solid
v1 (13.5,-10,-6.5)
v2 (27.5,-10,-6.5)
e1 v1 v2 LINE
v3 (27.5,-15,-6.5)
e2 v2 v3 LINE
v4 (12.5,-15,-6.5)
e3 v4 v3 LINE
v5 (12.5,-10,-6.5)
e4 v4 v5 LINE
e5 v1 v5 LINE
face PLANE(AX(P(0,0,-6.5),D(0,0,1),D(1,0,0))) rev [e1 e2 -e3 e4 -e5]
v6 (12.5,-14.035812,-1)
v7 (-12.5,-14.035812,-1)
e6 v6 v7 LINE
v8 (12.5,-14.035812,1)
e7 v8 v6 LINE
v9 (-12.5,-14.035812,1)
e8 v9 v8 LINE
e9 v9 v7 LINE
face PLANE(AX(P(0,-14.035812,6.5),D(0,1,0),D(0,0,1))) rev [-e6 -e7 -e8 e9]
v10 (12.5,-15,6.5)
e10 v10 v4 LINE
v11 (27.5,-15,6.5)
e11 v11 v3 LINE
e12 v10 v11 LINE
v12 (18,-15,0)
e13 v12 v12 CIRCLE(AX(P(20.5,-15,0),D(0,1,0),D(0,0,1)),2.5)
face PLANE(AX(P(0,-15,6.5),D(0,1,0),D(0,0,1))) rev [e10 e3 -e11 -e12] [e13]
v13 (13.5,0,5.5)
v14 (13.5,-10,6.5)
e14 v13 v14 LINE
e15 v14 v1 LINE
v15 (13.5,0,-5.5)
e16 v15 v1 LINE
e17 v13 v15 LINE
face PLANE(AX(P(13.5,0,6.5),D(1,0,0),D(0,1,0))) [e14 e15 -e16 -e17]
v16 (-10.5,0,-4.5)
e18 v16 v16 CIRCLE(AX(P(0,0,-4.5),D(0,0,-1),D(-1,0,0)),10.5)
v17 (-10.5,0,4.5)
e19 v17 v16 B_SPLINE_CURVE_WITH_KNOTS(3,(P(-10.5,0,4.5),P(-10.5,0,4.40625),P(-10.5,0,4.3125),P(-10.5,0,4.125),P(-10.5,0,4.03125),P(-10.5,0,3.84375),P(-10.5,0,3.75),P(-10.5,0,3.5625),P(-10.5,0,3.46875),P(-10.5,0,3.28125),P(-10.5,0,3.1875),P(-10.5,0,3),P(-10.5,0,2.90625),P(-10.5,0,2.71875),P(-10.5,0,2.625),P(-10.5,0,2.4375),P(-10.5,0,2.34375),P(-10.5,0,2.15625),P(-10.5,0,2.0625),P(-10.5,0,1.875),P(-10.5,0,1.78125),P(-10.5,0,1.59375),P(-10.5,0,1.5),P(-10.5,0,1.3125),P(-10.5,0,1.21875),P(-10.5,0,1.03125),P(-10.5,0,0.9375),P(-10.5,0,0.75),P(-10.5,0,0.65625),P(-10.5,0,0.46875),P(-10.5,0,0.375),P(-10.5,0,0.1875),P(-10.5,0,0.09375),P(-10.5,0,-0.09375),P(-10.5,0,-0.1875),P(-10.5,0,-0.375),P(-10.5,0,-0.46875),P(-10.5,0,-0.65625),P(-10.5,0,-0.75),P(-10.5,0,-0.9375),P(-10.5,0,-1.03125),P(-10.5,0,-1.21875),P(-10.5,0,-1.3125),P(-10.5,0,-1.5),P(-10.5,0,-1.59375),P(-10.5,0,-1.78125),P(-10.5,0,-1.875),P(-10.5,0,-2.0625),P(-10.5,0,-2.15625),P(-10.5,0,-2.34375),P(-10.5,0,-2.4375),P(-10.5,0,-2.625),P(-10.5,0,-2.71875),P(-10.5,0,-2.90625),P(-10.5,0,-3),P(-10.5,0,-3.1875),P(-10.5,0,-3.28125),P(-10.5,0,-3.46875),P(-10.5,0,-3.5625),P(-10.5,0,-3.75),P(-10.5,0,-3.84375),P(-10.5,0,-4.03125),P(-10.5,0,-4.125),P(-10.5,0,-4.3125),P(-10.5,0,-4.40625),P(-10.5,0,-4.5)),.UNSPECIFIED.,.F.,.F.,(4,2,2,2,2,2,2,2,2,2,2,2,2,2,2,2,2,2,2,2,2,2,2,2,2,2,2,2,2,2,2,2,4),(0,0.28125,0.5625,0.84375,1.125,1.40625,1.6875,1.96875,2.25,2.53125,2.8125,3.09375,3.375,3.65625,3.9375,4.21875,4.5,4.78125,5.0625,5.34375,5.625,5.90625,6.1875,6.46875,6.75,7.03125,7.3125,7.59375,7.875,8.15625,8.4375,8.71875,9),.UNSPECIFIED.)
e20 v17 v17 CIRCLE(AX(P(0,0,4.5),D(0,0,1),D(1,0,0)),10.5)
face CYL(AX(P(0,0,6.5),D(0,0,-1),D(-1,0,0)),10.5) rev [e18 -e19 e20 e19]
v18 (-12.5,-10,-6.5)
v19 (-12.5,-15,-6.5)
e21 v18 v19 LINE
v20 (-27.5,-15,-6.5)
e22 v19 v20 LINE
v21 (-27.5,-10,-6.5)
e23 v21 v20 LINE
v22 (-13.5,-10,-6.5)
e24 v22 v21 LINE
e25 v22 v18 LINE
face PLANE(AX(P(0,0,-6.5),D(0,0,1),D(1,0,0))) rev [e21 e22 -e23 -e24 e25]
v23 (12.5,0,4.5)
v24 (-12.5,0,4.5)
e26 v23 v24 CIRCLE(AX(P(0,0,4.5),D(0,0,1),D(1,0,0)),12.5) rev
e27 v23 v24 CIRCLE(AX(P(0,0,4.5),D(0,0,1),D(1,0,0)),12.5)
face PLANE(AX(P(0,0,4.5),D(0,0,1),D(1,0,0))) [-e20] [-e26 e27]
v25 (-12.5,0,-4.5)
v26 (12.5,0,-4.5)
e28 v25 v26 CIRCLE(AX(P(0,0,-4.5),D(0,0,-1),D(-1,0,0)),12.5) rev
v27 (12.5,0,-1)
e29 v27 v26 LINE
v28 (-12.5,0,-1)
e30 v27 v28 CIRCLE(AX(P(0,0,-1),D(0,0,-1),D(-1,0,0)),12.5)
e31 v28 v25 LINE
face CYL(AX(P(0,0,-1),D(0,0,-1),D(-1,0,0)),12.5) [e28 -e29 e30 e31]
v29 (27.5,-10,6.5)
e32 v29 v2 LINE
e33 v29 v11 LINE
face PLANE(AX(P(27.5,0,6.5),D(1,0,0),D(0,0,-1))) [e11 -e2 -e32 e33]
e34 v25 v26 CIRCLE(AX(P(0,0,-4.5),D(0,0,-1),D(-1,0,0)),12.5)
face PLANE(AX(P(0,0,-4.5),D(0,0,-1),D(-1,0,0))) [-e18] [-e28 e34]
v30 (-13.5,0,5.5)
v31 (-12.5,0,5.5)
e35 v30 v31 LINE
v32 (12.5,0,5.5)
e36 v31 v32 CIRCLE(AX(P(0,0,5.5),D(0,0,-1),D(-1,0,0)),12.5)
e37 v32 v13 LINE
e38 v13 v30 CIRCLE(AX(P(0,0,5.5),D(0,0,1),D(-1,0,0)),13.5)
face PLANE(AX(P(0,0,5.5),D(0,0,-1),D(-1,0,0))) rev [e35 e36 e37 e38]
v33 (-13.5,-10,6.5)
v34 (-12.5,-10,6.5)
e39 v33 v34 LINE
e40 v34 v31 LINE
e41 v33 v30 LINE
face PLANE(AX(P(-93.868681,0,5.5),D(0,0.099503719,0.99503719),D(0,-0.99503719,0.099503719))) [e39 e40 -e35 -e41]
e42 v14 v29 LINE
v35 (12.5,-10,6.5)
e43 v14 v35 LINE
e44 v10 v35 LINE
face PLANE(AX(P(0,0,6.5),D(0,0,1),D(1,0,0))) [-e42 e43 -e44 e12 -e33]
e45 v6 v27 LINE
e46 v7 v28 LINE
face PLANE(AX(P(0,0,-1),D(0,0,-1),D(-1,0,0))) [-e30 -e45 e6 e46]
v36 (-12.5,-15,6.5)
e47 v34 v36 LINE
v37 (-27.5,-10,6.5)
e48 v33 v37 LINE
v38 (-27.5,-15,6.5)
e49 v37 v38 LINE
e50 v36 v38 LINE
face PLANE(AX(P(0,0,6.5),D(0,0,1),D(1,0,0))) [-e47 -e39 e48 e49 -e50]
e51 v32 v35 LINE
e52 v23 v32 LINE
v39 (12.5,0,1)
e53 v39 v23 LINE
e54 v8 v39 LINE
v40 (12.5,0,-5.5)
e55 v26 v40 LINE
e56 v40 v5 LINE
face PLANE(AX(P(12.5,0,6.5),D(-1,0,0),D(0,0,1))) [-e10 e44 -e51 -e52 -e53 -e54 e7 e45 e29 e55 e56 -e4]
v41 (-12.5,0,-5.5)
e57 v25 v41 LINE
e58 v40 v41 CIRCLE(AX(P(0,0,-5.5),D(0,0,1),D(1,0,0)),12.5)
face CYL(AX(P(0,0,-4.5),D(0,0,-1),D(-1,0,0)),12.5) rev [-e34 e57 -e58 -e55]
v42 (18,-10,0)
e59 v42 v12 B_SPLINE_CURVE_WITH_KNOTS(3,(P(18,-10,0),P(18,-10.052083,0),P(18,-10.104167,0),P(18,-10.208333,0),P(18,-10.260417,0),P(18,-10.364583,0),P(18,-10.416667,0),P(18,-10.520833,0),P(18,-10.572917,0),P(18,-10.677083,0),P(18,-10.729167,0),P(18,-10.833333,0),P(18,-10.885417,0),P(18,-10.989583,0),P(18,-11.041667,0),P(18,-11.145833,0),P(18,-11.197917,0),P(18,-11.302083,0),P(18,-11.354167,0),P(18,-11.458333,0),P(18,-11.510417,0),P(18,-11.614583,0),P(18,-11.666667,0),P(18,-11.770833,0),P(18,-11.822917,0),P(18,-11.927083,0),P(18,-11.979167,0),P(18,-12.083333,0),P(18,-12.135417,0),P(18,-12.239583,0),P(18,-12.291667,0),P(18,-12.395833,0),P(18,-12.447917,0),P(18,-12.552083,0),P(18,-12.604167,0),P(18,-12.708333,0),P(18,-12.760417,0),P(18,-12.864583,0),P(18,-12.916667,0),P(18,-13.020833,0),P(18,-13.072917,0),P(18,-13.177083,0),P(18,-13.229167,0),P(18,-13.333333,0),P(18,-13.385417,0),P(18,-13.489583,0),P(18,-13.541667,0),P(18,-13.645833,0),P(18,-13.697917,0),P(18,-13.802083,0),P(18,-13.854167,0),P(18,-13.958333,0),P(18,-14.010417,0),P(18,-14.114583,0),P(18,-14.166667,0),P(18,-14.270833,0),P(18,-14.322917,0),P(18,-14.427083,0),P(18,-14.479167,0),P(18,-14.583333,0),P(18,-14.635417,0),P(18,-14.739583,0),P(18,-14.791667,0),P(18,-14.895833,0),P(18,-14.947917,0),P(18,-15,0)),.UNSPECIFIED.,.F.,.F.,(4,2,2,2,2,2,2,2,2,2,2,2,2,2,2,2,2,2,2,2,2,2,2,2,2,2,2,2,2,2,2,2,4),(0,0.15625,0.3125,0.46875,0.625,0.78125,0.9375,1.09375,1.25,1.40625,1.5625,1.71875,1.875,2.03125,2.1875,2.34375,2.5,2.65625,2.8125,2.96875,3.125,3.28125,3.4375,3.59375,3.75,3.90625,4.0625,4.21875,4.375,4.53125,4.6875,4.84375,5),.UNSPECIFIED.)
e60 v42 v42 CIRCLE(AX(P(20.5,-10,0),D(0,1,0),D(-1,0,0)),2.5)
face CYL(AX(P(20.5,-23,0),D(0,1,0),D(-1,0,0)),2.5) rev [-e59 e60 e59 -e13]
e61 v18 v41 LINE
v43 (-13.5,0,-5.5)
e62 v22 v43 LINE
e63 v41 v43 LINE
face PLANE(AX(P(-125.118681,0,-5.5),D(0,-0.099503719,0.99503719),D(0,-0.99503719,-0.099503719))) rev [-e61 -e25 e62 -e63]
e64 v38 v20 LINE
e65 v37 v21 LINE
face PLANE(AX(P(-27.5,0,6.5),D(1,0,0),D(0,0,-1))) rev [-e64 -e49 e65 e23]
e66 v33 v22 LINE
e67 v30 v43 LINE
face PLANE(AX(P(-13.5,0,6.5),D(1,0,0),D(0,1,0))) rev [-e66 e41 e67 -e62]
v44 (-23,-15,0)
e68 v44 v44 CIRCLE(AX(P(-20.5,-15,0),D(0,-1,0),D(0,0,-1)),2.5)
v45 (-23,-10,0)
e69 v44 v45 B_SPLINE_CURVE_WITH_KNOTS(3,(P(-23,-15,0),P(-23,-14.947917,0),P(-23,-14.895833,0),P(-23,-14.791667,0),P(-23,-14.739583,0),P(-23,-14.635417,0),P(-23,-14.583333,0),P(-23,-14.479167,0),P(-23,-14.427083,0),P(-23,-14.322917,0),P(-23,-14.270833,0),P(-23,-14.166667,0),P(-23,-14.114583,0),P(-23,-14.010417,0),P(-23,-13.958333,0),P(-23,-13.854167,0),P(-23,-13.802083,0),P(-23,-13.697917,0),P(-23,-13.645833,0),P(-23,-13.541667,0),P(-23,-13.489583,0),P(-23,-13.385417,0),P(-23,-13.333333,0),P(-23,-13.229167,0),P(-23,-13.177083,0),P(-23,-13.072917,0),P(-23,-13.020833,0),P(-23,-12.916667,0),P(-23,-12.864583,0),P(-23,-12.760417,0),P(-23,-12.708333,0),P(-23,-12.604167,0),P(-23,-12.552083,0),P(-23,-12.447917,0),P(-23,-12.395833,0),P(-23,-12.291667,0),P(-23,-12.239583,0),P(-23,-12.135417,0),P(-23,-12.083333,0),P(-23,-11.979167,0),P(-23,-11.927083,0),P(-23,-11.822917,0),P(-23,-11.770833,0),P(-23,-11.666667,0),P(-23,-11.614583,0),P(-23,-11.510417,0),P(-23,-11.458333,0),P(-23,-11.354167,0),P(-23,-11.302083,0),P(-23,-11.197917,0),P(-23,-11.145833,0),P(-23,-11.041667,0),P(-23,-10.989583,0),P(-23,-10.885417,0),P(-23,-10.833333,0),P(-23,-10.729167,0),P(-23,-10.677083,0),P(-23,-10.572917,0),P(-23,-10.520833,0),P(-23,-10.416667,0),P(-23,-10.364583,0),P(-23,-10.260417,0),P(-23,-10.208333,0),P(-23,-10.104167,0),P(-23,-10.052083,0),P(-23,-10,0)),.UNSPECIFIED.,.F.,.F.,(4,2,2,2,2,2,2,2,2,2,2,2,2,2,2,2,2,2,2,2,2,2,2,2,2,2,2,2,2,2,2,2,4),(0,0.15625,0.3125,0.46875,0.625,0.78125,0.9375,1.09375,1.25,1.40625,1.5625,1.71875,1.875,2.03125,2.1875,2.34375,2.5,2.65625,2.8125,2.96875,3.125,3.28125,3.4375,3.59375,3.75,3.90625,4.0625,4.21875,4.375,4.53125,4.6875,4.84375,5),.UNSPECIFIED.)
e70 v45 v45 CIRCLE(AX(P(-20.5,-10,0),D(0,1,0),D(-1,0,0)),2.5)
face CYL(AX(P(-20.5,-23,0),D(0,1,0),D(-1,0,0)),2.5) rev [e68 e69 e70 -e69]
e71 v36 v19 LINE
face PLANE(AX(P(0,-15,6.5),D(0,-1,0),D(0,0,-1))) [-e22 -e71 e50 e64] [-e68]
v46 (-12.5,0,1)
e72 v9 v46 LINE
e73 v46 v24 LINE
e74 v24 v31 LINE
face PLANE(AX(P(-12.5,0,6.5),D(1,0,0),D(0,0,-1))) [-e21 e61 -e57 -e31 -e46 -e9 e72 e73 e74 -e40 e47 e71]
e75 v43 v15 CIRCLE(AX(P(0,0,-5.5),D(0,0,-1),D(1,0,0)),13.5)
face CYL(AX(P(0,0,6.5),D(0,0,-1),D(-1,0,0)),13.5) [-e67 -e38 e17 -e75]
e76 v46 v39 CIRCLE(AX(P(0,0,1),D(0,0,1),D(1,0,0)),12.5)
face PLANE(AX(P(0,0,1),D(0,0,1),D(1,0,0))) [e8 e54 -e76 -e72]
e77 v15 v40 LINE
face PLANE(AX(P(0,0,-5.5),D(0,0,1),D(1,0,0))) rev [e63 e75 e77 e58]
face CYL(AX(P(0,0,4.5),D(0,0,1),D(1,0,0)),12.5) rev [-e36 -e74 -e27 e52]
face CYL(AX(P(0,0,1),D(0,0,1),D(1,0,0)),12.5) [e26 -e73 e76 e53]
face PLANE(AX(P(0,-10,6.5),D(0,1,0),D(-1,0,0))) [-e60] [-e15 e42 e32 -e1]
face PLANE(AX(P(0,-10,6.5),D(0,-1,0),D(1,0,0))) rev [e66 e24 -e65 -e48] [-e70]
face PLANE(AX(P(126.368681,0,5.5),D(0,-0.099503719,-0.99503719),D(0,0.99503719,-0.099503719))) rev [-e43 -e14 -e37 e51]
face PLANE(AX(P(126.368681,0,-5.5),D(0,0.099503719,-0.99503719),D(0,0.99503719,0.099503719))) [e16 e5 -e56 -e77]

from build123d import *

# Parameters (mm, degrees)
SKETCH1_R                = 12.5
SKETCH1_R_2              = 4
BOSS_EXTRUDE1_DEPTH      = 6.5
CUT_EXTRUDE1_DEPTH       = 5.5
CUT_EXTRUDE2_START       = -5.5
CUT_EXTRUDE2_DEPTH       = 5.5
SKETCH5_R                = 12.5
SKETCH5_R_2              = 10.5
CUT_EXTRUDE3_DEPTH       = 2
CUT_EXTRUDE4_START       = -2
SKETCH6_R                = 12.5
SKETCH6_R_2              = 10.5
CUT_EXTRUDE4_DEPTH       = 2
CUT_EXTRUDE5_START       = -13
SKETCH7_R                = 10.5
CUT_EXTRUDE5_DEPTH       = 13
SKETCH8_R                = 2.5
CUT_EXTRUDE6_DEPTH       = 13
CUT_EXTRUDE7_DEPTH       = 1
CUT_EXTRUDE8_START       = -1
CUT_EXTRUDE8_DEPTH       = 1
CUT_EXTRUDE9_START       = -1
CUT_EXTRUDE9_DEPTH       = 1
CUT_EXTRUDE10_DEPTH      = 45.138985036
CUT_EXTRUDE10_DEPTH_BACK = 1
CUT_EXTRUDE11_START      = -1
CUT_EXTRUDE11_DEPTH      = 1
CUT_EXTRUDE12_DEPTH      = 45.138985036
CUT_EXTRUDE12_DEPTH_BACK = 1


# Read off the part's stored shape, not the designer's step: Cut-Extrude9, Cut-Extrude11
with BuildPart() as part:
    # Sketch1 → Boss-Extrude1 (new, symmetric)
    # profile 1 of 10: a face of its own
    with BuildSketch(Plane.XY):
        Circle(SKETCH1_R)
        with Locations(Location((0, 0, 0), (0, 0, 180))):
            Circle(SKETCH1_R_2, mode=Mode.SUBTRACT)
    # profile 2 of 10: a face of its own
    with BuildSketch(Plane.XY):
        with BuildLine():
            ThreePointArc((-13.5, 0), (-13.247641299, -2.598076211), (-12.5, -5.099019514))
            Line((-12.5, -5.099019514), (-12.5, 0))
            ThreePointArc((-12.5, 0), (0, 12.5), (12.5, 0))
            Line((12.5, 0), (12.5, -5.099019514))
            ThreePointArc((12.5, -5.099019514), (13.247641299, -2.598076211), (13.5, 0))
            ThreePointArc((13.5, 0), (0, 13.5), (-13.5, 0))
        make_face()
    # profile 3 of 10: a face of its own
    with BuildSketch(Plane.XY):
        with BuildLine():
            Line((-12.5, 0), (-12.5, -5.099019514))
            ThreePointArc((-12.5, -5.099019514), (0, -13.5), (12.5, -5.099019514))
            Line((12.5, -5.099019514), (12.5, 0))
            ThreePointArc((12.5, 0), (0, -12.5), (-12.5, 0))
        make_face()
    # profile 4 of 10: a face of its own
    with BuildSketch(Plane.XY):
        with BuildLine():
            ThreePointArc((-13.5, 0), (-13.247641299, -2.598076211), (-12.5, -5.099019514))
            Line((-12.5, -5.099019514), (-12.5, 0))
            ThreePointArc((-12.5, 0), (0, 12.5), (12.5, 0))
            Line((12.5, 0), (12.5, -5.099019514))
            ThreePointArc((12.5, -5.099019514), (13.247641299, -2.598076211), (13.5, 0))
            ThreePointArc((13.5, 0), (0, 13.5), (-13.5, 0))
        make_face()
    # profile 5 of 10: a face of its own
    with BuildSketch(Plane.XY):
        with BuildLine():
            Line((-12.5, 0), (-12.5, -5.099019514))
            ThreePointArc((-12.5, -5.099019514), (0, -13.5), (12.5, -5.099019514))
            Line((12.5, -5.099019514), (12.5, 0))
            ThreePointArc((12.5, 0), (0, -12.5), (-12.5, 0))
        make_face()
    # profile 6 of 10: a face of its own
    with BuildSketch(Plane.XY):
        with BuildLine():
            Line((-13.5, -10), (-12.5, -10))
            Line((-12.5, -10), (-12.5, -5.099019514))
            ThreePointArc((-12.5, -5.099019514), (-13.247641299, -2.598076211), (-13.5, 0))
            Line((-13.5, 0), (-13.5, -10))
        make_face()
    # profile 7 of 10: a face of its own
    with BuildSketch(Plane.XY):
        Polygon((-12.5, -14.03581164), (-12.5, -10), (-13.5, -10), (-27.5, -10), (-27.5, -15), (-12.5, -15), align=None)
    # profile 8 of 10: a face of its own
    with BuildSketch(Plane.XY):
        with BuildLine():
            Line((-12.5, -5.099019514), (-12.5, -10))
            Line((-12.5, -10), (-12.5, -14.03581164))
            Line((-12.5, -14.03581164), (12.5, -14.03581164))
            Line((12.5, -14.03581164), (12.5, -10))
            Line((12.5, -10), (12.5, -5.099019514))
            ThreePointArc((12.5, -5.099019514), (0, -13.5), (-12.5, -5.099019514))
        make_face()
    # profile 9 of 10: a face of its own
    with BuildSketch(Plane.XY):
        Polygon((12.5, -10), (12.5, -14.03581164), (12.5, -15), (27.5, -15), (27.5, -10), (13.5, -10), align=None)
    # profile 10 of 10: a face of its own
    with BuildSketch(Plane.XY):
        with BuildLine():
            ThreePointArc((13.5, 0), (13.247641299, -2.598076211), (12.5, -5.099019514))
            Line((12.5, -5.099019514), (12.5, -10))
            Line((12.5, -10), (13.5, -10))
            Line((13.5, -10), (13.5, 0))
        make_face()
    extrude(amount=BOSS_EXTRUDE1_DEPTH, both=True)

    # Sketch3 → Cut-Extrude1 (cut)
    with BuildSketch(Plane.XY.offset(6.5)):
        with BuildLine():
            Line((-12.5, 0), (-12.5, -14.03581164))
            Line((-12.5, -14.03581164), (12.5, -14.03581164))
            Line((12.5, -14.03581164), (12.5, 0))
            ThreePointArc((12.5, 0), (0, -12.5), (-12.5, 0))
        make_face()
    extrude(amount=-CUT_EXTRUDE1_DEPTH, mode=Mode.SUBTRACT)

    # Sketch4 → Cut-Extrude2 (cut)
    with BuildSketch(Plane(origin=(0, 0, -6.5), x_dir=(-1, 0, 0), z_dir=(0, 0, -1)).offset(CUT_EXTRUDE2_START)):
        with BuildLine():
            Line((-12.5, 0), (-12.5, -14.03581164))
            Line((-12.5, -14.03581164), (12.5, -14.03581164))
            Line((12.5, -14.03581164), (12.5, 0))
            ThreePointArc((12.5, 0), (0, -12.5), (-12.5, 0))
        make_face()
    extrude(amount=CUT_EXTRUDE2_DEPTH, mode=Mode.SUBTRACT)

    # Sketch5 → Cut-Extrude3 (cut)
    with BuildSketch(Plane.XY.offset(6.5)):
        Circle(SKETCH5_R)
        Circle(SKETCH5_R_2, mode=Mode.SUBTRACT)
    extrude(amount=-CUT_EXTRUDE3_DEPTH, mode=Mode.SUBTRACT)

    # Sketch6 → Cut-Extrude4 (cut)
    with BuildSketch(Plane(origin=(0, 0, -6.5), x_dir=(-1, 0, 0), z_dir=(0, 0, -1)).offset(CUT_EXTRUDE4_START)):
        Circle(SKETCH6_R)
        with Locations(Location((0, 0, 0), (0, 0, 180))):
            Circle(SKETCH6_R_2, mode=Mode.SUBTRACT)
    extrude(amount=CUT_EXTRUDE4_DEPTH, mode=Mode.SUBTRACT)

    # Sketch7 → Cut-Extrude5 (cut)
    with BuildSketch(Plane(origin=(0, 0, -6.5), x_dir=(-1, 0, 0), z_dir=(0, 0, -1)).offset(CUT_EXTRUDE5_START)):
        Circle(SKETCH7_R)
    extrude(amount=CUT_EXTRUDE5_DEPTH, mode=Mode.SUBTRACT)

    # Sketch8 → Cut-Extrude6 (cut)
    with BuildSketch(Plane(origin=(0, -10, 0), x_dir=(1, 0, 0), z_dir=(0, 1, 0))):
        with Locations(Location((20.5, 0, 0), (0, 0, 180))):
            Circle(SKETCH8_R)
        with Locations(Location((-20.5, 0, 0), (0, 0, 180))):
            Circle(SKETCH8_R)
    extrude(amount=-CUT_EXTRUDE6_DEPTH, mode=Mode.SUBTRACT)

    # Sketch10 → Cut-Extrude7 (cut)
    with BuildSketch(Plane.XY.offset(6.5)):
        with BuildLine():
            Line((-13.5, 0), (-12.5, 0))
            ThreePointArc((-12.5, 0), (0, 12.5), (12.5, 0))
            Line((12.5, 0), (13.5, 0))
            ThreePointArc((13.5, 0), (0, 13.5), (-13.5, 0))
        make_face()
    extrude(amount=-CUT_EXTRUDE7_DEPTH, mode=Mode.SUBTRACT)

    # Sketch11 → Cut-Extrude8 (cut)
    with BuildSketch(Plane(origin=(0, 0, -6.5), x_dir=(-1, 0, 0), z_dir=(0, 0, -1)).offset(CUT_EXTRUDE8_START)):
        with BuildLine():
            Line((-13.5, 0), (-12.5, 0))
            ThreePointArc((-12.5, 0), (0, 12.5), (12.5, 0))
            Line((12.5, 0), (13.5, 0))
            ThreePointArc((13.5, 0), (0, 13.5), (-13.5, 0))
        make_face()
    extrude(amount=CUT_EXTRUDE8_DEPTH, mode=Mode.SUBTRACT)

    # Cut-Extrude9 outline → Cut-Extrude9 (cut)
    with BuildSketch(Plane(origin=(13.5, 0, 0), x_dir=(0, 0, -1), z_dir=(1, 0, 0)).offset(CUT_EXTRUDE9_START)):
        Polygon((-6.5, 0), (-6.5, -10), (-5.5, 0), align=None)
    extrude(amount=CUT_EXTRUDE9_DEPTH, mode=Mode.SUBTRACT)

    # Sketch13 → Cut-Extrude10 (cut, two sides: drawn at the far end of the back side and taken through both)
    with BuildSketch(Plane(origin=(13.5, 0, 0), x_dir=(0, 0, -1), z_dir=(1, 0, 0)).offset(-CUT_EXTRUDE10_DEPTH_BACK)):
        Polygon((6.5, 0), (5.5, 0), (6.5, -10), align=None)
    extrude(amount=CUT_EXTRUDE10_DEPTH + CUT_EXTRUDE10_DEPTH_BACK, mode=Mode.SUBTRACT)

    # Cut-Extrude11 outline → Cut-Extrude11 (cut)
    with BuildSketch(Plane.ZY.offset(13.5).offset(CUT_EXTRUDE11_START)):
        Polygon((-6.5, 0), (-6.5, -10), (-5.5, 0), align=None)
    extrude(amount=CUT_EXTRUDE11_DEPTH, mode=Mode.SUBTRACT)

    # Sketch15 → Cut-Extrude12 (cut, two sides: drawn at the far end of the back side and taken through both)
    with BuildSketch(Plane.ZY.offset(13.5).offset(-CUT_EXTRUDE12_DEPTH_BACK)):
        Polygon((6.5, 0), (5.5, 0), (6.5, -10), align=None)
    extrude(amount=CUT_EXTRUDE12_DEPTH + CUT_EXTRUDE12_DEPTH_BACK, mode=Mode.SUBTRACT)


solid = part.part
